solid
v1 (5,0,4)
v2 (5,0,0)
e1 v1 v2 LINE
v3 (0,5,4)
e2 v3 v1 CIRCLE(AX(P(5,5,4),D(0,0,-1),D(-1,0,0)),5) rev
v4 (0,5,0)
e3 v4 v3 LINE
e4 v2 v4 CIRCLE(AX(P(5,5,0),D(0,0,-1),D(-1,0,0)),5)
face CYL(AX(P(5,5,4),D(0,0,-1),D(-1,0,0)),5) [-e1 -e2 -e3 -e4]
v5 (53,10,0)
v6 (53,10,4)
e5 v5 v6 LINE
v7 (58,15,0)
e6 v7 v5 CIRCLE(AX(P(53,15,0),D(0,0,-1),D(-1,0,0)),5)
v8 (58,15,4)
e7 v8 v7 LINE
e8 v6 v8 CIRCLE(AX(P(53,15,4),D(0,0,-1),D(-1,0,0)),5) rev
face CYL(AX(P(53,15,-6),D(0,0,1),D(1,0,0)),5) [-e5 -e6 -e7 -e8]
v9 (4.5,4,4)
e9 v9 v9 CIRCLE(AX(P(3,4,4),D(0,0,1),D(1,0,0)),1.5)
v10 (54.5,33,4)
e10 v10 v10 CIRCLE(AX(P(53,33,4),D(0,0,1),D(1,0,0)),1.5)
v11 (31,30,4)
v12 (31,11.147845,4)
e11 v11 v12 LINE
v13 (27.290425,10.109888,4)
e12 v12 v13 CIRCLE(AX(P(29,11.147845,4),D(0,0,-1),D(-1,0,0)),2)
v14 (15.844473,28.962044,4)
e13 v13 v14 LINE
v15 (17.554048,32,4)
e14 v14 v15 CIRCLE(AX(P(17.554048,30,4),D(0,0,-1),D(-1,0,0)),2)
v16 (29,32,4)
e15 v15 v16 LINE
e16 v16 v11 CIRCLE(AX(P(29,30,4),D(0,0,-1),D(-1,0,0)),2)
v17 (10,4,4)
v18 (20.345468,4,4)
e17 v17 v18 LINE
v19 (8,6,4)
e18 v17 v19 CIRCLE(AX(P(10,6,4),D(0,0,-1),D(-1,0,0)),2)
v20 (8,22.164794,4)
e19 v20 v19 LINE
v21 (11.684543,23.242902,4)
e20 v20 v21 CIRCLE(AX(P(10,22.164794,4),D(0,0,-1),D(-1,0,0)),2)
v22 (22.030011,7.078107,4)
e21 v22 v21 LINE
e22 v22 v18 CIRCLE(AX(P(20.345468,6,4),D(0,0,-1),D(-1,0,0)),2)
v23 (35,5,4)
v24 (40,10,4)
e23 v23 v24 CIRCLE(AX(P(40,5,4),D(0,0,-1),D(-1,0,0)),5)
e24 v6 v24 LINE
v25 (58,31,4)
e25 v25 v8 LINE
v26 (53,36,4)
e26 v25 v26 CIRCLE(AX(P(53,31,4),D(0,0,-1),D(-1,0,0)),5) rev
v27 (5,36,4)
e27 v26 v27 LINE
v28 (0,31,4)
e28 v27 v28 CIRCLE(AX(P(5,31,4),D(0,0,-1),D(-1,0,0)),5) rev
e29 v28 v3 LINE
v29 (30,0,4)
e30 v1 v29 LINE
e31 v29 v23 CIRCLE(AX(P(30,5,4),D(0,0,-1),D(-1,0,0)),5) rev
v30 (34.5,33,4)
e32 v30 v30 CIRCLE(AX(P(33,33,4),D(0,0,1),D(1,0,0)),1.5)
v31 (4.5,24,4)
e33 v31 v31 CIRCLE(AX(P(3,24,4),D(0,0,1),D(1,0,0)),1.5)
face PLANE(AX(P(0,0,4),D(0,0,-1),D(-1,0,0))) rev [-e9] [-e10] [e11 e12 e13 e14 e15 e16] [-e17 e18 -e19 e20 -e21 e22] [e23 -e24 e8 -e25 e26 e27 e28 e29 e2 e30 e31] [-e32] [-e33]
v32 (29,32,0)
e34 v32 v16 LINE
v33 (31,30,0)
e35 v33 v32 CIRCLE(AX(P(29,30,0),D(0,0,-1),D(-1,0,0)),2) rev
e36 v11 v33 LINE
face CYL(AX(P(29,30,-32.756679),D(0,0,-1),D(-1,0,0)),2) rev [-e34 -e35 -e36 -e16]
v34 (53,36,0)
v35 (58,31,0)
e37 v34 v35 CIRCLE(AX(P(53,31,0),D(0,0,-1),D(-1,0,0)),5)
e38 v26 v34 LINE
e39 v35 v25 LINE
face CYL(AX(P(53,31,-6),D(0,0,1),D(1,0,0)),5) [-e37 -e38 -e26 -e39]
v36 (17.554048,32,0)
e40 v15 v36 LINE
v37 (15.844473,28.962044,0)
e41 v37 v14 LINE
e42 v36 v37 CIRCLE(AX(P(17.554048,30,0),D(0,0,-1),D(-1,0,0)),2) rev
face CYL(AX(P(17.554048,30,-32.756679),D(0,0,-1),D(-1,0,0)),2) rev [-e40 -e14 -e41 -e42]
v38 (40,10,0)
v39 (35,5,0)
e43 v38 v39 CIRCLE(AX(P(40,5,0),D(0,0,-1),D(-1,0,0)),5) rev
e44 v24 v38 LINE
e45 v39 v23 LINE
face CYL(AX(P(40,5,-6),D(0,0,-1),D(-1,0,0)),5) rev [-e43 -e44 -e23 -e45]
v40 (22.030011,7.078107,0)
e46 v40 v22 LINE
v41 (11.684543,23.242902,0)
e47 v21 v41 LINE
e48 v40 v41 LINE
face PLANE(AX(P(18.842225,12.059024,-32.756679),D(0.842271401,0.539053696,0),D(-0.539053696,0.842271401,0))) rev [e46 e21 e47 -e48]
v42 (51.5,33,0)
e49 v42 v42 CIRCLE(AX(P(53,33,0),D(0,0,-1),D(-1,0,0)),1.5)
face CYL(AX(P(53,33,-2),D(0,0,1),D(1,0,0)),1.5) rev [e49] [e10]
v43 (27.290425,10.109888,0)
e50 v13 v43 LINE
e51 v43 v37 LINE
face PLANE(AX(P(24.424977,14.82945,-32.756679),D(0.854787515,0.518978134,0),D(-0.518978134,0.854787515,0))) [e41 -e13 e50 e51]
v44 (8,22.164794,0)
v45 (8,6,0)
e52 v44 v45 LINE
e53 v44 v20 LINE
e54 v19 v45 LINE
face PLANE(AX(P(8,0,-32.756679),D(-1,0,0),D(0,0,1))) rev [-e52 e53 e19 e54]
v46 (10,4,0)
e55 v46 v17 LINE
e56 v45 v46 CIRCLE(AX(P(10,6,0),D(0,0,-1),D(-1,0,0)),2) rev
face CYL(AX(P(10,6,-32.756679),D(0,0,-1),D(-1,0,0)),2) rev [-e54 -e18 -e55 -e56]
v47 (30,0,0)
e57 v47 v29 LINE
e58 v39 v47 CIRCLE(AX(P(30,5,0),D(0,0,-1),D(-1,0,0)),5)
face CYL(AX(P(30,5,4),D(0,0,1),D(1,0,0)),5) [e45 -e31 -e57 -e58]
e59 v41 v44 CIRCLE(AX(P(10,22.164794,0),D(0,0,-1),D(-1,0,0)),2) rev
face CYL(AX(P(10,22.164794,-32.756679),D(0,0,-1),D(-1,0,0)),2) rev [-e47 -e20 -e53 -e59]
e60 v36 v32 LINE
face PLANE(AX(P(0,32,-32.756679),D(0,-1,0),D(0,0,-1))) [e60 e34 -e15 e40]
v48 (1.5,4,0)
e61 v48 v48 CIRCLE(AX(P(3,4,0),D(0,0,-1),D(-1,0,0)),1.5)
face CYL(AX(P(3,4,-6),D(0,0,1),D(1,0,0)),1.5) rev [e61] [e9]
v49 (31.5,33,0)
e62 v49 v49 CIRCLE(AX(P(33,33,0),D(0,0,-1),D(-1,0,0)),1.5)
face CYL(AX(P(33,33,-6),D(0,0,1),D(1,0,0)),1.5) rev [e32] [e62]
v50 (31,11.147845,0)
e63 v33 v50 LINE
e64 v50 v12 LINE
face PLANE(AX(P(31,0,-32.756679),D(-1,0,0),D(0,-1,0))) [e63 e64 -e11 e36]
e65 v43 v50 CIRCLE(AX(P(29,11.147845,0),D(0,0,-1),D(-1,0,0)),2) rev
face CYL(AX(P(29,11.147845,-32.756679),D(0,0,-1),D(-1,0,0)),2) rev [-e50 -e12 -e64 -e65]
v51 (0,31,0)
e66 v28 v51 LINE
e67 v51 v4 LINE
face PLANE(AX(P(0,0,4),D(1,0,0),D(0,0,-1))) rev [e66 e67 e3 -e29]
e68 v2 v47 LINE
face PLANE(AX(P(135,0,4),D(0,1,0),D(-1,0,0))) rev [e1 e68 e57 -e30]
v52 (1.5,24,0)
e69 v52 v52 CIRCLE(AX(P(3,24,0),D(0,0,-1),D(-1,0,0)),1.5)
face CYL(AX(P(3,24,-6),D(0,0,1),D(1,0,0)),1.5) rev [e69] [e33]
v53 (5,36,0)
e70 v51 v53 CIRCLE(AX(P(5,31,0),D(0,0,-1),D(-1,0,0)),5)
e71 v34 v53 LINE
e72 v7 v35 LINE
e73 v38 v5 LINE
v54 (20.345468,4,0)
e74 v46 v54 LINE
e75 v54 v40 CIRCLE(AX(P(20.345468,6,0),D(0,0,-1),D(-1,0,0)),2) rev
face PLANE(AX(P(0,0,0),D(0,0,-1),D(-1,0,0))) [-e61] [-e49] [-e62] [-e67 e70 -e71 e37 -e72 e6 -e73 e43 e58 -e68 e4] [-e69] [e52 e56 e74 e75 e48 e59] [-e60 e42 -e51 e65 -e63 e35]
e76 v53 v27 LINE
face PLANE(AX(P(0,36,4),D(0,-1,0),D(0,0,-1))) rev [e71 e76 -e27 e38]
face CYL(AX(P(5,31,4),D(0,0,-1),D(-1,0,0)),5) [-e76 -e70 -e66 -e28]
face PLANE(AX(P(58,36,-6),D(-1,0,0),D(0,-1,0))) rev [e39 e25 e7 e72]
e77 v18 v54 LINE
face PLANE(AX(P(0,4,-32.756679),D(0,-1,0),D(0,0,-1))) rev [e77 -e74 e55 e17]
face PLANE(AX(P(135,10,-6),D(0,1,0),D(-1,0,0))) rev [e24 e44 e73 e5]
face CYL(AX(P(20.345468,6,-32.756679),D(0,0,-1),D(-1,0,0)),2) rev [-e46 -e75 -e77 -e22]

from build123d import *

# Parameters (mm, degrees)
EXTRUDE_2_DEPTH      = 4
SKETCH_2_R           = 1.5
CUT_EXTRUDE_1_DEPTH  = 10
SKETCH_4_W           = 100
SKETCH_4_H           = 10
CUT_EXTRUDE_2_DEPTH  = 10
FILLET_1_R           = 5
SKETCH_5_R           = 1.5
CUT_EXTRUDE_3_DEPTH  = 6
SKETCH_7_W           = 4
SKETCH_7_H           = 25.94
EXTRUDE_3_DEPTH      = 2
FILLET_5_R           = 1
SKETCH_9_R           = 1.5
CUT_EXTRUDE_6_DEPTH  = 10
SKETCH_13_R          = 1.5
CUT_EXTRUDE_8_DEPTH  = 10
CUT_EXTRUDE_9_DEPTH  = 4
FILLET_9_R           = 2
SKETCH_15_W          = 4
SKETCH_15_H          = 25.94
CUT_EXTRUDE_12_DEPTH = 10
SKETCH_16_W          = 77
SKETCH_16_H          = 26
CUT_EXTRUDE_13_DEPTH = 10
FILLET_10_R          = 5


with BuildPart() as part:
    # 草图1 → 凸台-拉伸2 (new body)
    with BuildSketch(Plane.XY):
        Polygon((0, 0), (0, 36), (35, 36), (135, 36), (135, 16.447466896), (135, 0), align=None)
    extrude(amount=EXTRUDE_2_DEPTH)

    # 草图2 → 切除-拉伸1 (cut)
    with BuildSketch(Plane.XY.offset(4)):
        with Locations((3, 4)):
            Circle(SKETCH_2_R)
        with Locations((3, 24)):
            Circle(SKETCH_2_R)
    extrude(amount=-CUT_EXTRUDE_1_DEPTH, mode=Mode.SUBTRACT)

    # 草图4 → 切除-拉伸2 (cut)
    with BuildSketch(Plane.XY.offset(4)):
        with Locations((85, 5)):
            Rectangle(SKETCH_4_W, SKETCH_4_H)
    extrude(amount=-CUT_EXTRUDE_2_DEPTH, mode=Mode.SUBTRACT)

    # 圆角1
    fillet_1_edges = [part.edges().sort_by_distance(p)[0] for p in [
        (35, 10, 2),
        (135, 10, 2),
        (135, 36, 2),
        (0, 36, 2),
        (0, 0, 2),
        (35, 0, 2),
    ]]
    fillet(fillet_1_edges, radius=FILLET_1_R - 0.0001)  # a hair under: the kernel refuses the full size

    # 草图5 → 切除-拉伸3 (cut)
    with BuildSketch(Plane.XY.offset(4)):
        with Locations((97.5, 33)):
            Circle(SKETCH_5_R)
        with Locations((53, 33)):
            Circle(SKETCH_5_R)
        with Locations((77.5, 33)):
            Circle(SKETCH_5_R)
    extrude(amount=-CUT_EXTRUDE_3_DEPTH, mode=Mode.SUBTRACT)

    # 草图7 → 凸台-拉伸3 (add)
    with BuildSketch(Plane.XY.offset(4)):
        with Locations((-2, 18)):
            Rectangle(SKETCH_7_W, SKETCH_7_H)
    extrude(amount=-EXTRUDE_3_DEPTH)

    # 圆角5
    fillet_5_edges = [part.edges().sort_by_distance(p)[0] for p in [
        (-4, 5.03, 3),
        (-4, 30.97, 3),
    ]]
    fillet(fillet_5_edges, radius=FILLET_5_R)

    # 草图9 → 切除-拉伸6 (cut)
    with BuildSketch(Plane.XY.offset(4)):
        with Locations((110, 17)):
            Circle(SKETCH_9_R)
    extrude(amount=-CUT_EXTRUDE_6_DEPTH, mode=Mode.SUBTRACT)

    # 草图13 → 切除-拉伸8 (cut)
    with BuildSketch(Plane.XY.offset(4)):
        with Locations((33, 33)):
            Circle(SKETCH_13_R)
    extrude(amount=-CUT_EXTRUDE_8_DEPTH, mode=Mode.SUBTRACT)

    # 草图11 → 切除-拉伸9 (cut)
    with BuildSketch(Plane.XY.offset(4)):
        Polygon((31, 4), (14, 32), (31, 32), align=None)
        Polygon((8, 4), (24, 4), (8, 29), align=None)
    extrude(amount=-CUT_EXTRUDE_9_DEPTH, mode=Mode.SUBTRACT)

    # 圆角9
    fillet_9_edges = [part.edges().sort_by_distance(p)[0] for p in [
        (8, 29, 2),
        (8, 4, 2),
        (24, 4, 2),
        (31, 4, 2),
        (14, 32, 2),
        (31, 32, 2),
    ]]
    fillet(fillet_9_edges, radius=FILLET_9_R)

    # 草图15 → 切除-拉伸12 (cut)
    with BuildSketch(Plane.XY.offset(4)):
        with Locations((-2, 18)):
            Rectangle(SKETCH_15_W, SKETCH_15_H)
    extrude(amount=-CUT_EXTRUDE_12_DEPTH, mode=Mode.SUBTRACT)

    # 草图16 → 切除-拉伸13 (cut)
    with BuildSketch(Plane.XY.offset(4)):
        with Locations((96.5, 23)):
            Rectangle(SKETCH_16_W, SKETCH_16_H)
    extrude(amount=-CUT_EXTRUDE_13_DEPTH, mode=Mode.SUBTRACT)

    # 圆角10
    fillet_10_edges = [part.edges().sort_by_distance(p)[0] for p in [
        (58, 36, 2),
        (58, 10, 2),
    ]]
    fillet(fillet_10_edges, radius=FILLET_10_R)


solid = part.part
